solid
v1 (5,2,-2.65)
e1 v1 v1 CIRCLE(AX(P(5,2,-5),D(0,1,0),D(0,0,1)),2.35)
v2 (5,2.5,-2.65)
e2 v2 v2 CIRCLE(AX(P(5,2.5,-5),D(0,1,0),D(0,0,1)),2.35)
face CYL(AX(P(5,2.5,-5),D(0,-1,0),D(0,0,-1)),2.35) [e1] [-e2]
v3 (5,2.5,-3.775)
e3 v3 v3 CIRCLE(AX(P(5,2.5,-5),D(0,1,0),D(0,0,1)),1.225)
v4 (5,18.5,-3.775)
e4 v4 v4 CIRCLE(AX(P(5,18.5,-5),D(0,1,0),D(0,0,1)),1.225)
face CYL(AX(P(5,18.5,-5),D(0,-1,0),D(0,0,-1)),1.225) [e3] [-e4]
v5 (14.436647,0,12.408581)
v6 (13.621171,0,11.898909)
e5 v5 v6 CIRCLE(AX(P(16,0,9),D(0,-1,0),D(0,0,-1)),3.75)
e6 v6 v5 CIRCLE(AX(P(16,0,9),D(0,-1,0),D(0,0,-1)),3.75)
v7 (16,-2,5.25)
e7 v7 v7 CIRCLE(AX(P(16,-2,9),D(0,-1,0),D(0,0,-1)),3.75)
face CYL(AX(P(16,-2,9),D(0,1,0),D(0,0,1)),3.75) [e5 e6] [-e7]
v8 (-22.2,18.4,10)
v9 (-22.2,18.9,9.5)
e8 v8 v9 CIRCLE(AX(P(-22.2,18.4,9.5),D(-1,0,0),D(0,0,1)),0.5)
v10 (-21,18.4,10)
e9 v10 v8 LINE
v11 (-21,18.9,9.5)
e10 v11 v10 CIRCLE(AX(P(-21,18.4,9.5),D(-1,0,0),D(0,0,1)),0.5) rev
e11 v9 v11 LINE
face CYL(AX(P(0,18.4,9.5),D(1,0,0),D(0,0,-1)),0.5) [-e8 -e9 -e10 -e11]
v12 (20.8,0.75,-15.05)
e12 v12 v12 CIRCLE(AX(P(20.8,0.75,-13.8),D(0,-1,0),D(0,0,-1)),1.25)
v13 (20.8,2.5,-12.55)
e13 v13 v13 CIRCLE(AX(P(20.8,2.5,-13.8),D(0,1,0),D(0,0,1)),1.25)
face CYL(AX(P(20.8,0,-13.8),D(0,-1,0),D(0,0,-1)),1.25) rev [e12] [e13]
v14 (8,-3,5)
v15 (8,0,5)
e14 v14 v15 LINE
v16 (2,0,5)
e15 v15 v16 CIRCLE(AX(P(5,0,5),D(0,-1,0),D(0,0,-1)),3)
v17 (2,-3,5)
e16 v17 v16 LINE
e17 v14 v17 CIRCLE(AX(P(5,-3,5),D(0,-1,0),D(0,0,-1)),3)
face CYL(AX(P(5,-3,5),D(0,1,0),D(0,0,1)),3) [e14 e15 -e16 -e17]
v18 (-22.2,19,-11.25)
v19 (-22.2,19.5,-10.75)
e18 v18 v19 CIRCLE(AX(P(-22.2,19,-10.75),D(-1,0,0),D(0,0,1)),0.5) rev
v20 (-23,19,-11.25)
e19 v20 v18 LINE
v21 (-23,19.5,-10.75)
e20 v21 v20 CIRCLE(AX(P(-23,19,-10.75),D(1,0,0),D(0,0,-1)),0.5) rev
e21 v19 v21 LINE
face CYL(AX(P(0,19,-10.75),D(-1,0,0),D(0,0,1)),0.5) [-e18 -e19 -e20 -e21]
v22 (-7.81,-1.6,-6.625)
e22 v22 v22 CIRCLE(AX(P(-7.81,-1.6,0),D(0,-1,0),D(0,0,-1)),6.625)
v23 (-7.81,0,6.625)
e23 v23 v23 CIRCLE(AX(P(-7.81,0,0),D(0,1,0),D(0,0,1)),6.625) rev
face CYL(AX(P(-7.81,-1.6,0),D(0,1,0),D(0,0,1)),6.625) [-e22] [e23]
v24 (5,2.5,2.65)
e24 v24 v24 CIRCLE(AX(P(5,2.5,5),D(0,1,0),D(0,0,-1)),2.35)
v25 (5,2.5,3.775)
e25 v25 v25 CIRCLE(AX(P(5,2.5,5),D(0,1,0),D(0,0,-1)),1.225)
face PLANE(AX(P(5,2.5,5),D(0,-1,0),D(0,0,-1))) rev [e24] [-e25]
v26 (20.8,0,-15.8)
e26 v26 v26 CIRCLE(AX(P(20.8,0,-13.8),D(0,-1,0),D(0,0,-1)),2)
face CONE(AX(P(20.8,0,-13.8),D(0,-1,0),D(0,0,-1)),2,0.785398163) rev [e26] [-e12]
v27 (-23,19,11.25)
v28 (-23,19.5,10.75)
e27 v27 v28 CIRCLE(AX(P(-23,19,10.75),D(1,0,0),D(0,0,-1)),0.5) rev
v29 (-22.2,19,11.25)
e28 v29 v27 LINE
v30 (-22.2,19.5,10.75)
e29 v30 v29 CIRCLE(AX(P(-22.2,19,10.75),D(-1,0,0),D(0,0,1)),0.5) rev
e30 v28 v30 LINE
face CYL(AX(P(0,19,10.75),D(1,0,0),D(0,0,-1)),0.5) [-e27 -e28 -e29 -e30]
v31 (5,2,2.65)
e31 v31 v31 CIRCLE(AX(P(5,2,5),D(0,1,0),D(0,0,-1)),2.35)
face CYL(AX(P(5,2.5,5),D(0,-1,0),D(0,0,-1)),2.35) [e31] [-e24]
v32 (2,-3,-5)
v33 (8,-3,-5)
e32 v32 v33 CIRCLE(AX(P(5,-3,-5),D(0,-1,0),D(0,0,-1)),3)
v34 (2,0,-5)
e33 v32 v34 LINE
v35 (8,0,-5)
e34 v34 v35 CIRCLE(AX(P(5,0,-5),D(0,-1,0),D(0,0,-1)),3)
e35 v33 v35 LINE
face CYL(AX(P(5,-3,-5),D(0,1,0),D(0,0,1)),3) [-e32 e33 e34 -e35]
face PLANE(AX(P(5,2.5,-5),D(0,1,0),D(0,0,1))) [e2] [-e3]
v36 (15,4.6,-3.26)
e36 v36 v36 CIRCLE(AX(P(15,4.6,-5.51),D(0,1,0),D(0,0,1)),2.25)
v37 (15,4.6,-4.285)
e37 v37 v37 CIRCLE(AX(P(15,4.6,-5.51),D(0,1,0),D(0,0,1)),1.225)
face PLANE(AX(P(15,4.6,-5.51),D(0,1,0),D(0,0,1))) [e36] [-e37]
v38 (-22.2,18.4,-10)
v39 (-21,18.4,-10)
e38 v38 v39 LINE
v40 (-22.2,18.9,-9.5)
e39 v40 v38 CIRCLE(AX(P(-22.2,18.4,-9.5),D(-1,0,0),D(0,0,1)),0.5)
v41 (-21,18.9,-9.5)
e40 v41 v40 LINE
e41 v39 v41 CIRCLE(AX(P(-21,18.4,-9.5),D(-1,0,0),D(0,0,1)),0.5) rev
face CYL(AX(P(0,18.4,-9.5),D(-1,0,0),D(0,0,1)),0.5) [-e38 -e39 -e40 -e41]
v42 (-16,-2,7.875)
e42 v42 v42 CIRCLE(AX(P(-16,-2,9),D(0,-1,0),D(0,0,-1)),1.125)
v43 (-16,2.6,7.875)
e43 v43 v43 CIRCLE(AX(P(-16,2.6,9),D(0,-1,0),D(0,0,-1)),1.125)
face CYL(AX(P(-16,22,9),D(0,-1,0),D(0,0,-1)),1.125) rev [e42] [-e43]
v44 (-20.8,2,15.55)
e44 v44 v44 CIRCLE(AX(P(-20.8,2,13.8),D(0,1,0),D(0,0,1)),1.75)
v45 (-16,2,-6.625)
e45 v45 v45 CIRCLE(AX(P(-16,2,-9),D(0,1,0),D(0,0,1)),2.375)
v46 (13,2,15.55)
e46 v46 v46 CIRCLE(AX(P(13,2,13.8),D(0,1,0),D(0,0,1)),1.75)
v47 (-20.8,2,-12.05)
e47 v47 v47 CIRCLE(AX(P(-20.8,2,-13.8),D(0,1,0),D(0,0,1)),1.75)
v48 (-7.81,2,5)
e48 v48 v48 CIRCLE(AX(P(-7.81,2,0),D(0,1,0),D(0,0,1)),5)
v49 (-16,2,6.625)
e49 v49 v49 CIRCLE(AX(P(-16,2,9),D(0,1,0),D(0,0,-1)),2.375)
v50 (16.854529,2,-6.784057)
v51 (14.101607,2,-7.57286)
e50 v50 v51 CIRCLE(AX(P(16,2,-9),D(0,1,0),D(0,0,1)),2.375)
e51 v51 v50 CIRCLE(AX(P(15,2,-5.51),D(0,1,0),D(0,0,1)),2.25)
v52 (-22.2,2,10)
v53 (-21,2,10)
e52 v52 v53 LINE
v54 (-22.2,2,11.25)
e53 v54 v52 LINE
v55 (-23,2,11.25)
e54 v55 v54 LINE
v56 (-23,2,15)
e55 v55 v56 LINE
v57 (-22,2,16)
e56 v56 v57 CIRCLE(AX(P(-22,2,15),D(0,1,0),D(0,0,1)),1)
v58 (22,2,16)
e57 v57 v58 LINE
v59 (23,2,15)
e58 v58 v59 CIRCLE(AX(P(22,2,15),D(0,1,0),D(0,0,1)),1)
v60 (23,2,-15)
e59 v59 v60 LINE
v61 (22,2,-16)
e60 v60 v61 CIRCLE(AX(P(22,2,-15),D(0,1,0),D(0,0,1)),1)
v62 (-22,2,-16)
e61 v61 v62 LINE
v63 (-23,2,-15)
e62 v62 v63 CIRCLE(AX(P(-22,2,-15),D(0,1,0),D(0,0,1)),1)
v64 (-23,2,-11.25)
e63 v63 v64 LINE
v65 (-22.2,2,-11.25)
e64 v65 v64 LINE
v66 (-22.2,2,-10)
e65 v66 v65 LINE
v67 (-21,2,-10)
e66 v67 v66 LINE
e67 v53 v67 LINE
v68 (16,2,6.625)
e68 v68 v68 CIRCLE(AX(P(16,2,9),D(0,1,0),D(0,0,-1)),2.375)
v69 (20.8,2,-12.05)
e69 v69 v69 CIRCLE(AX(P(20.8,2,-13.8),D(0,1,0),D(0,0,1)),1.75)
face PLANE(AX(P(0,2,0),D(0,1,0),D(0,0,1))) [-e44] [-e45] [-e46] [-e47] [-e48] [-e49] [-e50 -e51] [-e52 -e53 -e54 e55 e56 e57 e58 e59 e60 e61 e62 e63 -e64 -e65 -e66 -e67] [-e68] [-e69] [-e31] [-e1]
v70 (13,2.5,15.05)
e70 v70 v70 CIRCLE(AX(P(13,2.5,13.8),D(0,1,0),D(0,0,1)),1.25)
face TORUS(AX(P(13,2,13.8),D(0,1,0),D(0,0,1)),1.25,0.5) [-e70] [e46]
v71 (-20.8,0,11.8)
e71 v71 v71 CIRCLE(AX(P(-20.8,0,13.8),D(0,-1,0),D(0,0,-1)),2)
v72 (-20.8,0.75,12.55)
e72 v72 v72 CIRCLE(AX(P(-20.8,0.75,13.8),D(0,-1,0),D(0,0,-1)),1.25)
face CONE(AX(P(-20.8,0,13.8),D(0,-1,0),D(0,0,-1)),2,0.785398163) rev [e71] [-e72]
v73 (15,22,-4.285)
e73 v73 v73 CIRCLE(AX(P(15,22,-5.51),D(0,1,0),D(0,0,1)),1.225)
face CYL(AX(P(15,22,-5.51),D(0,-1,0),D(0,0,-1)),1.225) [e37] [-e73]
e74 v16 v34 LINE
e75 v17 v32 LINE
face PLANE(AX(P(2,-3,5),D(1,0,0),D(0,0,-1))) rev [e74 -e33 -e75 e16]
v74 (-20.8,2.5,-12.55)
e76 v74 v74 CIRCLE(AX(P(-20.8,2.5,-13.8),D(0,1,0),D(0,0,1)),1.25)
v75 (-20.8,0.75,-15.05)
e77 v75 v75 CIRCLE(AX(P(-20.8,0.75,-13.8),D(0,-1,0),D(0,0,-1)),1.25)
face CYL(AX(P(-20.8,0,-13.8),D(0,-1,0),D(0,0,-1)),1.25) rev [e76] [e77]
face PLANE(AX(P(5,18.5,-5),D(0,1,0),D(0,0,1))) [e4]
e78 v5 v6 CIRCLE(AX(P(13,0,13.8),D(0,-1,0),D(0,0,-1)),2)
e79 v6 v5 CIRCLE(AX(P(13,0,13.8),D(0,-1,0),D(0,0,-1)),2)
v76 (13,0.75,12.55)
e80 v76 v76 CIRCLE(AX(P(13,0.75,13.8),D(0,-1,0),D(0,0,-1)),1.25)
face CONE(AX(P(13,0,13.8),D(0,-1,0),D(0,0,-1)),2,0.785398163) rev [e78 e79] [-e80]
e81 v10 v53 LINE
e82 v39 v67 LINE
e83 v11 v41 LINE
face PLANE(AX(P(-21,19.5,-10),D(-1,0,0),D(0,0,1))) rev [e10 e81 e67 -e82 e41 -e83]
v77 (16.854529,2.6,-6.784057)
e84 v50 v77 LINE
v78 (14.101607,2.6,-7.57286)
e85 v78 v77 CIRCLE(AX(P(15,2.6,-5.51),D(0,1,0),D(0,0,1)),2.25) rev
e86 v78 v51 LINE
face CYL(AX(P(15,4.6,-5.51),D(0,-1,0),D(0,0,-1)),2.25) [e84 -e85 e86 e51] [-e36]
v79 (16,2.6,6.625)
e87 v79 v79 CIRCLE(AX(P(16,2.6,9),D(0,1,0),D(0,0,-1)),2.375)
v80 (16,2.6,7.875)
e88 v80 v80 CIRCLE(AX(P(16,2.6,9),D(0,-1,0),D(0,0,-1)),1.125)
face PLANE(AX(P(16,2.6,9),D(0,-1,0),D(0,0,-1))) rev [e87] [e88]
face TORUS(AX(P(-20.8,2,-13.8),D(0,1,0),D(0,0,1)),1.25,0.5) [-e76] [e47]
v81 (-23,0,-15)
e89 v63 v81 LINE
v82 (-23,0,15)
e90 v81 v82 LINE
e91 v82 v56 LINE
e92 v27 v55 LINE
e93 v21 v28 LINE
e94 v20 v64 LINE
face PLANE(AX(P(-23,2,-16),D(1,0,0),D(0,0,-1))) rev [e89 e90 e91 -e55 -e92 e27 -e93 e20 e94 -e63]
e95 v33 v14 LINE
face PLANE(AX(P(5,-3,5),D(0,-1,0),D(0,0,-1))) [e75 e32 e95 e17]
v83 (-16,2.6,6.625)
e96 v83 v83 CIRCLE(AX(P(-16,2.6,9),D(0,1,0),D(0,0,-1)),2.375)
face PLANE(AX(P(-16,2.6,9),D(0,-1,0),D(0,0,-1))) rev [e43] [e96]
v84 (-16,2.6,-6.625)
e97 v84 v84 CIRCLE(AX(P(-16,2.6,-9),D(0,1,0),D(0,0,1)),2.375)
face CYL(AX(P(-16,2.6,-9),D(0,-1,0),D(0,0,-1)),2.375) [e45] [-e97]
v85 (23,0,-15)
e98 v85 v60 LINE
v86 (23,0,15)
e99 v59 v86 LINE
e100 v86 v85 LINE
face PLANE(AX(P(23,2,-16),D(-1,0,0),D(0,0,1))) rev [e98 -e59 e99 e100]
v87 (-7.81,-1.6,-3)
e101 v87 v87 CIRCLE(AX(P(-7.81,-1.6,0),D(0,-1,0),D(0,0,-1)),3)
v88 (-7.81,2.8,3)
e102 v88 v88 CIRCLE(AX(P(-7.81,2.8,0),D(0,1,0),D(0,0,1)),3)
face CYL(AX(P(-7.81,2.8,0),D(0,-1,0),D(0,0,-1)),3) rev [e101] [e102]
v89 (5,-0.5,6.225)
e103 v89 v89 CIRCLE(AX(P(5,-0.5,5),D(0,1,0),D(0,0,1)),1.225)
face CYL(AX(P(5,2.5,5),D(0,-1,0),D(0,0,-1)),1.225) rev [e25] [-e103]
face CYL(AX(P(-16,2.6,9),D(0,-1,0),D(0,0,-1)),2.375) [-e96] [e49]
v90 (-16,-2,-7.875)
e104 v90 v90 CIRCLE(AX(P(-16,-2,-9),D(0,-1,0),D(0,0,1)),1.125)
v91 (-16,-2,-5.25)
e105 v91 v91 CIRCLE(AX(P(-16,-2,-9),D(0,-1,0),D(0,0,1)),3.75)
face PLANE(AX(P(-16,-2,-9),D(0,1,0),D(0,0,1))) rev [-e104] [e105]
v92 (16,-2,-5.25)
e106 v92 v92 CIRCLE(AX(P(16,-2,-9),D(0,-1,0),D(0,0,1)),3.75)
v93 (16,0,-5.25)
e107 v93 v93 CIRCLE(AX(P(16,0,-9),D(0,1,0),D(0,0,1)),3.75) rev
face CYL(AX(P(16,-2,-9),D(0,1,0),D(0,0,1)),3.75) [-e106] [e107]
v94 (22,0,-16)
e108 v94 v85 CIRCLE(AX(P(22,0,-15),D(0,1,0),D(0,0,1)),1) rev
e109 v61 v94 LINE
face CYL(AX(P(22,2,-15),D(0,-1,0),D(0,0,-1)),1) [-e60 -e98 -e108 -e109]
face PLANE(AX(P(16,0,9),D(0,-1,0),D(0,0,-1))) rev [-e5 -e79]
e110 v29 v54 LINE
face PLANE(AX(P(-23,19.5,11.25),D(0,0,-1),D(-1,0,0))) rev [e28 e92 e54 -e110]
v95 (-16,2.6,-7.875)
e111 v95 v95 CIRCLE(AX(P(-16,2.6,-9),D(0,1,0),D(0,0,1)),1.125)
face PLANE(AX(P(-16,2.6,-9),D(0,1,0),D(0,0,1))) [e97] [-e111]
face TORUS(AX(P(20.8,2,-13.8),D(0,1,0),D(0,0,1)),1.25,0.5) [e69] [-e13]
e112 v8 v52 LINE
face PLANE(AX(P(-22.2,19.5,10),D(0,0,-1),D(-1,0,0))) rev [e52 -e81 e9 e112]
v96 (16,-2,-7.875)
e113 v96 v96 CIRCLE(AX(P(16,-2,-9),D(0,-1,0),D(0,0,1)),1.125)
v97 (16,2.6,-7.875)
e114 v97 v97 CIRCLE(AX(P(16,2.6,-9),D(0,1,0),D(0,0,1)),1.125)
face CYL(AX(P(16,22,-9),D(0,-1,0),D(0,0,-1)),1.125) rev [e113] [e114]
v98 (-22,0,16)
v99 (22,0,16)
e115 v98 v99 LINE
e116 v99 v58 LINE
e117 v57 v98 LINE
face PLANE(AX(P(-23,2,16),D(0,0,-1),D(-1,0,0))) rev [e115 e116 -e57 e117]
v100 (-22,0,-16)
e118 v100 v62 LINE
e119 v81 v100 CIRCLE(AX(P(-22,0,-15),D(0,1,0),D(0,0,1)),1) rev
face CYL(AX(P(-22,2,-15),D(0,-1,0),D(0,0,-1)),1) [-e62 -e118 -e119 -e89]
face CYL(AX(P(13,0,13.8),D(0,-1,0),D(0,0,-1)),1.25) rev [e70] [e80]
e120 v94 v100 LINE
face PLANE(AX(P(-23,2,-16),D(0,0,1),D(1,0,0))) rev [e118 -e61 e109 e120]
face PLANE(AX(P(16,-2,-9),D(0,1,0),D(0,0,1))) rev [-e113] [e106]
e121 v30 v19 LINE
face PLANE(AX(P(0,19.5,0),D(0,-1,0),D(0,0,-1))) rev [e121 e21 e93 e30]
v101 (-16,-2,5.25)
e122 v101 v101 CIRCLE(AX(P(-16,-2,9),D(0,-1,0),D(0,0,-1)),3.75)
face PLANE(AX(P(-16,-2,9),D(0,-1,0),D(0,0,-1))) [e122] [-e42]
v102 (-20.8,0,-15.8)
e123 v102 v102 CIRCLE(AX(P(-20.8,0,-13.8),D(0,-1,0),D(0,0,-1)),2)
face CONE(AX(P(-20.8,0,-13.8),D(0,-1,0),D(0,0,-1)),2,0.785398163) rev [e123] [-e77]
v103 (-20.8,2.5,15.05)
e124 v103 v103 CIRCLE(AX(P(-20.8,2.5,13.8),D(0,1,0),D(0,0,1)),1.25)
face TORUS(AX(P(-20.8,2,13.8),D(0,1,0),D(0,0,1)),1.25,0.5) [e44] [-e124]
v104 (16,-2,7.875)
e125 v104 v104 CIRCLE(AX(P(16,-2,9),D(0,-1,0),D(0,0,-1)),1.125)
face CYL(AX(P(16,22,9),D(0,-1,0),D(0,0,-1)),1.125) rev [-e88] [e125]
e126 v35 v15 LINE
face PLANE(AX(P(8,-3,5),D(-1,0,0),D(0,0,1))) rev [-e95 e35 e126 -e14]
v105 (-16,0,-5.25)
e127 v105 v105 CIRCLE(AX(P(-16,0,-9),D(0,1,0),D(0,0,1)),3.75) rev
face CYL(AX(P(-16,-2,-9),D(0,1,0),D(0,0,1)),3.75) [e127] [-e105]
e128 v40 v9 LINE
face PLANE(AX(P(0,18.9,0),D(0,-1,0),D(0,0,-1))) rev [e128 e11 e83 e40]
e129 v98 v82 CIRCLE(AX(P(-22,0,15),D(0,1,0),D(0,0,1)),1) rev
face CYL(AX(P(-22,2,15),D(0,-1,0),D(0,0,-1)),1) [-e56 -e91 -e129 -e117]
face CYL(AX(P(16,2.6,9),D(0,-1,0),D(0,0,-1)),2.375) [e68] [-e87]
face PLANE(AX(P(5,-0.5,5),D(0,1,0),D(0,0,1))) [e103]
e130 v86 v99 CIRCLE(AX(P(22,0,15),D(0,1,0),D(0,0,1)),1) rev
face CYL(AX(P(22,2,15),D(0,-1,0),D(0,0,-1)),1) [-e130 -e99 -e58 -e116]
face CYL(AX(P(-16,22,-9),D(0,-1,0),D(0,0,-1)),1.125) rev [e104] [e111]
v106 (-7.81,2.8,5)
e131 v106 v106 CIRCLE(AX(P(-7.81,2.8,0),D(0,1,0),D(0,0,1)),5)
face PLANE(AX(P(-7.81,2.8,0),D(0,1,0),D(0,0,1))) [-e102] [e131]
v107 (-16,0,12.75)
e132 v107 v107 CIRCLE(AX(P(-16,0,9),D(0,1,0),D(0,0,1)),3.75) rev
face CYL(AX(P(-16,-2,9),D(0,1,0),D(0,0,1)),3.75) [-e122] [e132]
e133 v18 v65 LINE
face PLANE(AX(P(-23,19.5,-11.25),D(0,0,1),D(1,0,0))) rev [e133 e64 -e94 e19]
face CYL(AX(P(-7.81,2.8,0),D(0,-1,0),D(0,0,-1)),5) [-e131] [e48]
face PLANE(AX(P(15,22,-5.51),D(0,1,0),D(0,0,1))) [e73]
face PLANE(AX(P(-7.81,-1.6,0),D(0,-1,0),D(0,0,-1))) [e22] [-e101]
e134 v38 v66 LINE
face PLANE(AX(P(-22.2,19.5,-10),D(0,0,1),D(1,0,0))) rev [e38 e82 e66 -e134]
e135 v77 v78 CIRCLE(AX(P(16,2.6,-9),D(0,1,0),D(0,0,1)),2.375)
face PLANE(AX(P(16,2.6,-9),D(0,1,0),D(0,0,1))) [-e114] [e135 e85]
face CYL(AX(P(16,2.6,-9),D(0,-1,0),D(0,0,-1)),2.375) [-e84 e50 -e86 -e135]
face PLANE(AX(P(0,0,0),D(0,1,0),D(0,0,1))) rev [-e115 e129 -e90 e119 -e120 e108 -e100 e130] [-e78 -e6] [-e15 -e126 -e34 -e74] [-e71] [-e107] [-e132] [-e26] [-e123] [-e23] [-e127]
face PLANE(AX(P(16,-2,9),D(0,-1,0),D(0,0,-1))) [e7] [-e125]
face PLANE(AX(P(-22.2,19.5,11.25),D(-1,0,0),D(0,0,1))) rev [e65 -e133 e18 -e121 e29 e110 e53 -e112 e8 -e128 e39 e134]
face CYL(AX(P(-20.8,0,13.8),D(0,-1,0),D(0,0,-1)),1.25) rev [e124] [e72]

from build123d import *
from build123d.topology import SkipClean

# Parameters (mm, degrees)
SKETCH1_W                                            = 46
SKETCH1_H                                            = 32
BOSS_EXTRUDE1_DEPTH                                  = 2
BOSS_EXTRUDE2_DEPTH                                  = 17.5
SKETCH3_W                                            = 1.2
SKETCH3_H                                            = 20
CUT_EXTRUDE1_DEPTH                                   = 0.6
FILLET1_R                                            = 0.5
FILLET2_R                                            = 1
SKETCH4_R                                            = 2.375
BOSS_EXTRUDE3_DEPTH                                  = 0.6
SKETCH6_R                                            = 1
BOSS_EXTRUDE4_DEPTH                                  = 0.75
CSK_FOR_M6_HEX_SOCKET_COUNTERSUNK_CAP_SC_D           = 2.5
CSK_FOR_M6_HEX_SOCKET_COUNTERSUNK_CAP_SC_CSINK_D     = 4
CSK_FOR_M6_HEX_SOCKET_COUNTERSUNK_CAP_SC_CSINK_ANGLE = 90
BOSS_EXTRUDE5_START                                  = 0.5
SKETCH13_R                                           = 1.75
SKETCH13_R_2                                         = 1.25
BOSS_EXTRUDE5_DEPTH                                  = 0.5
FILLET3_R                                            = 0.5
SKETCH14_R                                           = 5
SKETCH14_R_2                                         = 3
BOSS_EXTRUDE6_DEPTH                                  = 0.8
SKETCH15_R                                           = 3
CUT_EXTRUDE2_DEPTH                                   = 34.034073318
SKETCH16_R                                           = 6.625
SKETCH16_R_2                                         = 3
BOSS_EXTRUDE7_DEPTH                                  = 1.6
SKETCH18_R                                           = 3.75
BOSS_EXTRUDE9_DEPTH                                  = 2
SKETCH20_R                                           = 2.35
SKETCH20_R_2                                         = 1.225
BOSS_EXTRUDE10_DEPTH                                 = 0.5
BOSS_EXTRUDE11_DEPTH                                 = 3
CUT_EXTRUDE5_START                                   = -3
SKETCH23_R                                           = 1.225
CUT_EXTRUDE5_DEPTH                                   = 3
SKETCH24_R                                           = 2.25
SKETCH24_R_2                                         = 1.225
BOSS_EXTRUDE12_DEPTH                                 = 2.6
SKETCH25_R                                           = 1.225
BOSS_EXTRUDE13_DEPTH                                 = 19
SKETCH27_R                                           = 1.225
BOSS_EXTRUDE15_DEPTH                                 = 20
SKETCH29_R                                           = 1.125
CUT_EXTRUDE6_DEPTH                                   = 37.891733491


with BuildPart() as part:
    # Sketch1 → Boss-Extrude1 (new body)
    with BuildSketch(Plane(origin=(0, 0, 0), x_dir=(1, 0, 0), z_dir=(0, 1, 0))):
        Rectangle(SKETCH1_W, SKETCH1_H)
    extrude(amount=BOSS_EXTRUDE1_DEPTH)

    # Sketch2 → Boss-Extrude2 (add)
    with BuildSketch(Plane(origin=(0, 2, 0), x_dir=(1, 0, 0), z_dir=(0, 1, 0))):
        Polygon((-23, -11.25), (-23, 11.25), (-22.2, 11.25), (-22.2, 10), (-21, 10), (-21, -10), (-22.2, -10), (-22.2, -11.25), align=None)
    extrude(amount=BOSS_EXTRUDE2_DEPTH)

    # Sketch3 → Cut-Extrude1 (cut)
    with BuildSketch(Plane(origin=(0, 19.5, 0), x_dir=(1, 0, 0), z_dir=(0, 1, 0))):
        with Locations((-21.6, 0)):
            Rectangle(SKETCH3_W, SKETCH3_H)
    extrude(amount=-CUT_EXTRUDE1_DEPTH, mode=Mode.SUBTRACT)

    # Fillet1
    fillet1_edges = [part.edges().sort_by_distance(p)[0] for p in [
        (-22.6, 19.5, -11.25),
        (-22.6, 19.5, 11.25),
        (-21.6, 18.9, 10),
        (-21.6, 18.9, -10),
    ]]
    fillet(fillet1_edges, radius=FILLET1_R)

    # Fillet2
    fillet2_edges = [part.edges().sort_by_distance(p)[0] for p in [
        (-23, 1, -16),
        (23, 1, -16),
        (23, 1, 16),
        (-23, 1, 16),
    ]]
    fillet(fillet2_edges, radius=FILLET2_R)

    # Sketch4 → Boss-Extrude3 (add)
    with BuildSketch(Plane(origin=(0, 2, 0), x_dir=(1, 0, 0), z_dir=(0, 1, 0))):
        with Locations(Location((16, 9, 0), (0, 0, 270))):
            Circle(SKETCH4_R)
        with Locations(Location((-16, 9, 0), (0, 0, 270))):
            Circle(SKETCH4_R)
        with Locations(Location((16, -9, 0), (0, 0, 90))):
            Circle(SKETCH4_R)
        with Locations(Location((-16, -9, 0), (0, 0, 90))):
            Circle(SKETCH4_R)
    extrude(amount=BOSS_EXTRUDE3_DEPTH)

    # Sketch6 → Boss-Extrude4 (add)
    with BuildSketch(Plane(origin=(0, 2, 0), x_dir=(1, 0, 0), z_dir=(0, 1, 0))):
        with Locations(Location((-16, 9, 0), (0, 0, 270))):
            Circle(SKETCH6_R)
        with Locations(Location((16, 9, 0), (0, 0, 270))):
            Circle(SKETCH6_R)
        with Locations(Location((16, -9, 0), (0, 0, 90))):
            Circle(SKETCH6_R)
        with Locations(Location((-16, -9, 0), (0, 0, 90))):
            Circle(SKETCH6_R)
    extrude(amount=BOSS_EXTRUDE4_DEPTH)

    # CSK for M6 Hex Socket Countersunk Cap Screw1 (through all)
    with Locations(Plane(origin=(0, 0, 0), x_dir=(-1, 0, 0), z_dir=(0, -1, 0))):
        with Locations((-20.8, 13.8), (20.8, 13.8), (20.8, -13.8), (-13, -13.8)):
            CounterSinkHole(CSK_FOR_M6_HEX_SOCKET_COUNTERSUNK_CAP_SC_D / 2, CSK_FOR_M6_HEX_SOCKET_COUNTERSUNK_CAP_SC_CSINK_D / 2, counter_sink_angle=CSK_FOR_M6_HEX_SOCKET_COUNTERSUNK_CAP_SC_CSINK_ANGLE)

    # Sketch13 → Boss-Extrude5 (add)
    # profile 1 of 4: a face of its own
    with BuildSketch(Plane(origin=(0, 2, 0), x_dir=(1, 0, 0), z_dir=(0, 1, 0)).offset(BOSS_EXTRUDE5_START)):
        with Locations(Location((-20.8, 13.8, 0), (0, 0, 270))):
            Circle(SKETCH13_R)
        with Locations(Location((-20.8, 13.8, 0), (0, 0, 90))):
            Circle(SKETCH13_R_2, mode=Mode.SUBTRACT)
    # profile 2 of 4: a face of its own
    with BuildSketch(Plane(origin=(0, 2, 0), x_dir=(1, 0, 0), z_dir=(0, 1, 0)).offset(BOSS_EXTRUDE5_START)):
        with Locations(Location((-20.8, -13.8, 0), (0, 0, 270))):
            Circle(SKETCH13_R)
        with Locations(Location((-20.8, -13.8, 0), (0, 0, 90))):
            Circle(SKETCH13_R_2, mode=Mode.SUBTRACT)
    # profile 3 of 4: a face of its own
    with BuildSketch(Plane(origin=(0, 2, 0), x_dir=(1, 0, 0), z_dir=(0, 1, 0)).offset(BOSS_EXTRUDE5_START)):
        with Locations(Location((13, -13.8, 0), (0, 0, 270))):
            Circle(SKETCH13_R)
        with Locations(Location((13, -13.8, 0), (0, 0, 90))):
            Circle(SKETCH13_R_2, mode=Mode.SUBTRACT)
    # profile 4 of 4: a face of its own
    with BuildSketch(Plane(origin=(0, 2, 0), x_dir=(1, 0, 0), z_dir=(0, 1, 0)).offset(BOSS_EXTRUDE5_START)):
        with Locations(Location((20.8, 13.8, 0), (0, 0, 270))):
            Circle(SKETCH13_R)
        with Locations(Location((20.8, 13.8, 0), (0, 0, 90))):
            Circle(SKETCH13_R_2, mode=Mode.SUBTRACT)
    extrude(amount=-BOSS_EXTRUDE5_DEPTH)

    # Fillet3
    fillet3_edges = [part.edges().sort_by_distance(p)[0] for p in [
        (-20.8, 2.5, -15.55),
        (-20.8, 2.5, 12.05),
        (13, 2.5, 12.05),
        (20.8, 2.5, -15.55),
    ]]
    fillet(fillet3_edges, radius=FILLET3_R - 0.0001)  # a hair under: the kernel refuses the full size

    # Sketch14 → Boss-Extrude6 (add)
    with BuildSketch(Plane(origin=(0, 2, 0), x_dir=(1, 0, 0), z_dir=(0, 1, 0))):
        with Locations(Location((-7.81, 0, 0), (0, 0, 270))):
            Circle(SKETCH14_R)
        with Locations(Location((-7.81, 0, 0), (0, 0, 270))):
            Circle(SKETCH14_R_2, mode=Mode.SUBTRACT)
    extrude(amount=BOSS_EXTRUDE6_DEPTH)

    # Sketch15 → Cut-Extrude2 (cut, through all)
    with BuildSketch(Plane(origin=(0, 2, 0), x_dir=(1, 0, 0), z_dir=(0, 1, 0))):
        with Locations(Location((-7.81, 0, 0), (0, 0, 270))):
            Circle(SKETCH15_R)
    extrude(amount=-CUT_EXTRUDE2_DEPTH, mode=Mode.SUBTRACT)

    # Sketch16 → Boss-Extrude7 (add)
    with SkipClean():  # the faces are left unmerged after this step: merging them gives an invalid solid
        with BuildSketch(Plane.XZ):
            with Locations(Location((-7.81, 0, 0), (0, 0, 90))):
                Circle(SKETCH16_R)
            with Locations(Location((-7.81, 0, 0), (0, 0, 270))):
                Circle(SKETCH16_R_2, mode=Mode.SUBTRACT)
        extrude(amount=BOSS_EXTRUDE7_DEPTH)
    add(part.part.scale(1), mode=Mode.REPLACE)  # the faces are merged on a copy

    # Sketch18 → Boss-Extrude9 (add)
    with BuildSketch(Plane.XZ):
        with Locations(Location((-16, 9, 0), (0, 0, 90))):
            Circle(SKETCH18_R)
        with Locations(Location((16, 9, 0), (0, 0, 114.638658222))):
            Circle(SKETCH18_R)
        with Locations(Location((16, -9, 0), (0, 0, 90))):
            Circle(SKETCH18_R)
        with Locations(Location((-16, -9, 0), (0, 0, 90))):
            Circle(SKETCH18_R)
    extrude(amount=BOSS_EXTRUDE9_DEPTH)

    # Sketch20 → Boss-Extrude10 (add)
    # profile 1 of 2: a face of its own
    with BuildSketch(Plane(origin=(0, 2, 0), x_dir=(1, 0, 0), z_dir=(0, 1, 0))):
        with Locations(Location((5, 5, 0), (0, 0, 270))):
            Circle(SKETCH20_R)
        with Locations(Location((5, 5, 0), (0, 0, 270))):
            Circle(SKETCH20_R_2, mode=Mode.SUBTRACT)
    # profile 2 of 2: a face of its own
    with BuildSketch(Plane(origin=(0, 2, 0), x_dir=(1, 0, 0), z_dir=(0, 1, 0))):
        with Locations(Location((5, -5, 0), (0, 0, 90))):
            Circle(SKETCH20_R)
        with Locations(Location((5, -5, 0), (0, 0, 90))):
            Circle(SKETCH20_R_2, mode=Mode.SUBTRACT)
    extrude(amount=BOSS_EXTRUDE10_DEPTH)

    # Sketch21 → Boss-Extrude11 (add)
    with BuildSketch(Plane.XZ):
        with BuildLine():
            Line((8, 5), (8, -5))
            ThreePointArc((8, -5), (5, -8), (2, -5))
            Line((2, -5), (2, 5))
            ThreePointArc((2, 5), (5, 8), (8, 5))
        make_face()
    extrude(amount=BOSS_EXTRUDE11_DEPTH)

    # Sketch23 → Cut-Extrude5 (cut)
    with BuildSketch(Plane(origin=(0, 2.5, 0), x_dir=(1, 0, 0), z_dir=(0, 1, 0)).offset(CUT_EXTRUDE5_START)):
        with Locations(Location((5, 5, 0), (0, 0, 270))):
            Circle(SKETCH23_R)
        with Locations(Location((5, -5, 0), (0, 0, 90))):
            Circle(SKETCH23_R)
    extrude(amount=CUT_EXTRUDE5_DEPTH, mode=Mode.SUBTRACT)

    # Sketch24 → Boss-Extrude12 (add)
    with BuildSketch(Plane(origin=(0, 2, 0), x_dir=(1, 0, 0), z_dir=(0, 1, 0))):
        with Locations(Location((15, 5.51, 0), (0, 0, 113.53353381))):
            Circle(SKETCH24_R)
        with Locations(Location((15, 5.51, 0), (0, 0, 270))):
            Circle(SKETCH24_R_2, mode=Mode.SUBTRACT)
    extrude(amount=BOSS_EXTRUDE12_DEPTH)

    # Sketch25 → Boss-Extrude13 (add)
    with BuildSketch(Plane(origin=(0, -0.5, 0), x_dir=(1, 0, 0), z_dir=(0, 1, 0))):
        with Locations(Location((5, 5, 0), (0, 0, 270))):
            Circle(SKETCH25_R)
    extrude(amount=BOSS_EXTRUDE13_DEPTH)

    # Sketch27 → Boss-Extrude15 (add)
    with BuildSketch(Plane(origin=(0, 2, 0), x_dir=(1, 0, 0), z_dir=(0, 1, 0))):
        with Locations(Location((15, 5.51, 0), (0, 0, 270))):
            Circle(SKETCH27_R)
    extrude(amount=BOSS_EXTRUDE15_DEPTH)

    # Sketch29 → Cut-Extrude6 (cut, through all)
    with BuildSketch(Plane.XZ.offset(2)):
        with Locations(Location((-16, 9, 0), (0, 0, 270))):
            Circle(SKETCH29_R)
        with Locations(Location((16, 9, 0), (0, 0, 270))):
            Circle(SKETCH29_R)
        with Locations(Location((16, -9, 0), (0, 0, 90))):
            Circle(SKETCH29_R)
        with Locations(Location((-16, -9, 0), (0, 0, 90))):
            Circle(SKETCH29_R)
    extrude(amount=-CUT_EXTRUDE6_DEPTH, mode=Mode.SUBTRACT)


solid = part.part
